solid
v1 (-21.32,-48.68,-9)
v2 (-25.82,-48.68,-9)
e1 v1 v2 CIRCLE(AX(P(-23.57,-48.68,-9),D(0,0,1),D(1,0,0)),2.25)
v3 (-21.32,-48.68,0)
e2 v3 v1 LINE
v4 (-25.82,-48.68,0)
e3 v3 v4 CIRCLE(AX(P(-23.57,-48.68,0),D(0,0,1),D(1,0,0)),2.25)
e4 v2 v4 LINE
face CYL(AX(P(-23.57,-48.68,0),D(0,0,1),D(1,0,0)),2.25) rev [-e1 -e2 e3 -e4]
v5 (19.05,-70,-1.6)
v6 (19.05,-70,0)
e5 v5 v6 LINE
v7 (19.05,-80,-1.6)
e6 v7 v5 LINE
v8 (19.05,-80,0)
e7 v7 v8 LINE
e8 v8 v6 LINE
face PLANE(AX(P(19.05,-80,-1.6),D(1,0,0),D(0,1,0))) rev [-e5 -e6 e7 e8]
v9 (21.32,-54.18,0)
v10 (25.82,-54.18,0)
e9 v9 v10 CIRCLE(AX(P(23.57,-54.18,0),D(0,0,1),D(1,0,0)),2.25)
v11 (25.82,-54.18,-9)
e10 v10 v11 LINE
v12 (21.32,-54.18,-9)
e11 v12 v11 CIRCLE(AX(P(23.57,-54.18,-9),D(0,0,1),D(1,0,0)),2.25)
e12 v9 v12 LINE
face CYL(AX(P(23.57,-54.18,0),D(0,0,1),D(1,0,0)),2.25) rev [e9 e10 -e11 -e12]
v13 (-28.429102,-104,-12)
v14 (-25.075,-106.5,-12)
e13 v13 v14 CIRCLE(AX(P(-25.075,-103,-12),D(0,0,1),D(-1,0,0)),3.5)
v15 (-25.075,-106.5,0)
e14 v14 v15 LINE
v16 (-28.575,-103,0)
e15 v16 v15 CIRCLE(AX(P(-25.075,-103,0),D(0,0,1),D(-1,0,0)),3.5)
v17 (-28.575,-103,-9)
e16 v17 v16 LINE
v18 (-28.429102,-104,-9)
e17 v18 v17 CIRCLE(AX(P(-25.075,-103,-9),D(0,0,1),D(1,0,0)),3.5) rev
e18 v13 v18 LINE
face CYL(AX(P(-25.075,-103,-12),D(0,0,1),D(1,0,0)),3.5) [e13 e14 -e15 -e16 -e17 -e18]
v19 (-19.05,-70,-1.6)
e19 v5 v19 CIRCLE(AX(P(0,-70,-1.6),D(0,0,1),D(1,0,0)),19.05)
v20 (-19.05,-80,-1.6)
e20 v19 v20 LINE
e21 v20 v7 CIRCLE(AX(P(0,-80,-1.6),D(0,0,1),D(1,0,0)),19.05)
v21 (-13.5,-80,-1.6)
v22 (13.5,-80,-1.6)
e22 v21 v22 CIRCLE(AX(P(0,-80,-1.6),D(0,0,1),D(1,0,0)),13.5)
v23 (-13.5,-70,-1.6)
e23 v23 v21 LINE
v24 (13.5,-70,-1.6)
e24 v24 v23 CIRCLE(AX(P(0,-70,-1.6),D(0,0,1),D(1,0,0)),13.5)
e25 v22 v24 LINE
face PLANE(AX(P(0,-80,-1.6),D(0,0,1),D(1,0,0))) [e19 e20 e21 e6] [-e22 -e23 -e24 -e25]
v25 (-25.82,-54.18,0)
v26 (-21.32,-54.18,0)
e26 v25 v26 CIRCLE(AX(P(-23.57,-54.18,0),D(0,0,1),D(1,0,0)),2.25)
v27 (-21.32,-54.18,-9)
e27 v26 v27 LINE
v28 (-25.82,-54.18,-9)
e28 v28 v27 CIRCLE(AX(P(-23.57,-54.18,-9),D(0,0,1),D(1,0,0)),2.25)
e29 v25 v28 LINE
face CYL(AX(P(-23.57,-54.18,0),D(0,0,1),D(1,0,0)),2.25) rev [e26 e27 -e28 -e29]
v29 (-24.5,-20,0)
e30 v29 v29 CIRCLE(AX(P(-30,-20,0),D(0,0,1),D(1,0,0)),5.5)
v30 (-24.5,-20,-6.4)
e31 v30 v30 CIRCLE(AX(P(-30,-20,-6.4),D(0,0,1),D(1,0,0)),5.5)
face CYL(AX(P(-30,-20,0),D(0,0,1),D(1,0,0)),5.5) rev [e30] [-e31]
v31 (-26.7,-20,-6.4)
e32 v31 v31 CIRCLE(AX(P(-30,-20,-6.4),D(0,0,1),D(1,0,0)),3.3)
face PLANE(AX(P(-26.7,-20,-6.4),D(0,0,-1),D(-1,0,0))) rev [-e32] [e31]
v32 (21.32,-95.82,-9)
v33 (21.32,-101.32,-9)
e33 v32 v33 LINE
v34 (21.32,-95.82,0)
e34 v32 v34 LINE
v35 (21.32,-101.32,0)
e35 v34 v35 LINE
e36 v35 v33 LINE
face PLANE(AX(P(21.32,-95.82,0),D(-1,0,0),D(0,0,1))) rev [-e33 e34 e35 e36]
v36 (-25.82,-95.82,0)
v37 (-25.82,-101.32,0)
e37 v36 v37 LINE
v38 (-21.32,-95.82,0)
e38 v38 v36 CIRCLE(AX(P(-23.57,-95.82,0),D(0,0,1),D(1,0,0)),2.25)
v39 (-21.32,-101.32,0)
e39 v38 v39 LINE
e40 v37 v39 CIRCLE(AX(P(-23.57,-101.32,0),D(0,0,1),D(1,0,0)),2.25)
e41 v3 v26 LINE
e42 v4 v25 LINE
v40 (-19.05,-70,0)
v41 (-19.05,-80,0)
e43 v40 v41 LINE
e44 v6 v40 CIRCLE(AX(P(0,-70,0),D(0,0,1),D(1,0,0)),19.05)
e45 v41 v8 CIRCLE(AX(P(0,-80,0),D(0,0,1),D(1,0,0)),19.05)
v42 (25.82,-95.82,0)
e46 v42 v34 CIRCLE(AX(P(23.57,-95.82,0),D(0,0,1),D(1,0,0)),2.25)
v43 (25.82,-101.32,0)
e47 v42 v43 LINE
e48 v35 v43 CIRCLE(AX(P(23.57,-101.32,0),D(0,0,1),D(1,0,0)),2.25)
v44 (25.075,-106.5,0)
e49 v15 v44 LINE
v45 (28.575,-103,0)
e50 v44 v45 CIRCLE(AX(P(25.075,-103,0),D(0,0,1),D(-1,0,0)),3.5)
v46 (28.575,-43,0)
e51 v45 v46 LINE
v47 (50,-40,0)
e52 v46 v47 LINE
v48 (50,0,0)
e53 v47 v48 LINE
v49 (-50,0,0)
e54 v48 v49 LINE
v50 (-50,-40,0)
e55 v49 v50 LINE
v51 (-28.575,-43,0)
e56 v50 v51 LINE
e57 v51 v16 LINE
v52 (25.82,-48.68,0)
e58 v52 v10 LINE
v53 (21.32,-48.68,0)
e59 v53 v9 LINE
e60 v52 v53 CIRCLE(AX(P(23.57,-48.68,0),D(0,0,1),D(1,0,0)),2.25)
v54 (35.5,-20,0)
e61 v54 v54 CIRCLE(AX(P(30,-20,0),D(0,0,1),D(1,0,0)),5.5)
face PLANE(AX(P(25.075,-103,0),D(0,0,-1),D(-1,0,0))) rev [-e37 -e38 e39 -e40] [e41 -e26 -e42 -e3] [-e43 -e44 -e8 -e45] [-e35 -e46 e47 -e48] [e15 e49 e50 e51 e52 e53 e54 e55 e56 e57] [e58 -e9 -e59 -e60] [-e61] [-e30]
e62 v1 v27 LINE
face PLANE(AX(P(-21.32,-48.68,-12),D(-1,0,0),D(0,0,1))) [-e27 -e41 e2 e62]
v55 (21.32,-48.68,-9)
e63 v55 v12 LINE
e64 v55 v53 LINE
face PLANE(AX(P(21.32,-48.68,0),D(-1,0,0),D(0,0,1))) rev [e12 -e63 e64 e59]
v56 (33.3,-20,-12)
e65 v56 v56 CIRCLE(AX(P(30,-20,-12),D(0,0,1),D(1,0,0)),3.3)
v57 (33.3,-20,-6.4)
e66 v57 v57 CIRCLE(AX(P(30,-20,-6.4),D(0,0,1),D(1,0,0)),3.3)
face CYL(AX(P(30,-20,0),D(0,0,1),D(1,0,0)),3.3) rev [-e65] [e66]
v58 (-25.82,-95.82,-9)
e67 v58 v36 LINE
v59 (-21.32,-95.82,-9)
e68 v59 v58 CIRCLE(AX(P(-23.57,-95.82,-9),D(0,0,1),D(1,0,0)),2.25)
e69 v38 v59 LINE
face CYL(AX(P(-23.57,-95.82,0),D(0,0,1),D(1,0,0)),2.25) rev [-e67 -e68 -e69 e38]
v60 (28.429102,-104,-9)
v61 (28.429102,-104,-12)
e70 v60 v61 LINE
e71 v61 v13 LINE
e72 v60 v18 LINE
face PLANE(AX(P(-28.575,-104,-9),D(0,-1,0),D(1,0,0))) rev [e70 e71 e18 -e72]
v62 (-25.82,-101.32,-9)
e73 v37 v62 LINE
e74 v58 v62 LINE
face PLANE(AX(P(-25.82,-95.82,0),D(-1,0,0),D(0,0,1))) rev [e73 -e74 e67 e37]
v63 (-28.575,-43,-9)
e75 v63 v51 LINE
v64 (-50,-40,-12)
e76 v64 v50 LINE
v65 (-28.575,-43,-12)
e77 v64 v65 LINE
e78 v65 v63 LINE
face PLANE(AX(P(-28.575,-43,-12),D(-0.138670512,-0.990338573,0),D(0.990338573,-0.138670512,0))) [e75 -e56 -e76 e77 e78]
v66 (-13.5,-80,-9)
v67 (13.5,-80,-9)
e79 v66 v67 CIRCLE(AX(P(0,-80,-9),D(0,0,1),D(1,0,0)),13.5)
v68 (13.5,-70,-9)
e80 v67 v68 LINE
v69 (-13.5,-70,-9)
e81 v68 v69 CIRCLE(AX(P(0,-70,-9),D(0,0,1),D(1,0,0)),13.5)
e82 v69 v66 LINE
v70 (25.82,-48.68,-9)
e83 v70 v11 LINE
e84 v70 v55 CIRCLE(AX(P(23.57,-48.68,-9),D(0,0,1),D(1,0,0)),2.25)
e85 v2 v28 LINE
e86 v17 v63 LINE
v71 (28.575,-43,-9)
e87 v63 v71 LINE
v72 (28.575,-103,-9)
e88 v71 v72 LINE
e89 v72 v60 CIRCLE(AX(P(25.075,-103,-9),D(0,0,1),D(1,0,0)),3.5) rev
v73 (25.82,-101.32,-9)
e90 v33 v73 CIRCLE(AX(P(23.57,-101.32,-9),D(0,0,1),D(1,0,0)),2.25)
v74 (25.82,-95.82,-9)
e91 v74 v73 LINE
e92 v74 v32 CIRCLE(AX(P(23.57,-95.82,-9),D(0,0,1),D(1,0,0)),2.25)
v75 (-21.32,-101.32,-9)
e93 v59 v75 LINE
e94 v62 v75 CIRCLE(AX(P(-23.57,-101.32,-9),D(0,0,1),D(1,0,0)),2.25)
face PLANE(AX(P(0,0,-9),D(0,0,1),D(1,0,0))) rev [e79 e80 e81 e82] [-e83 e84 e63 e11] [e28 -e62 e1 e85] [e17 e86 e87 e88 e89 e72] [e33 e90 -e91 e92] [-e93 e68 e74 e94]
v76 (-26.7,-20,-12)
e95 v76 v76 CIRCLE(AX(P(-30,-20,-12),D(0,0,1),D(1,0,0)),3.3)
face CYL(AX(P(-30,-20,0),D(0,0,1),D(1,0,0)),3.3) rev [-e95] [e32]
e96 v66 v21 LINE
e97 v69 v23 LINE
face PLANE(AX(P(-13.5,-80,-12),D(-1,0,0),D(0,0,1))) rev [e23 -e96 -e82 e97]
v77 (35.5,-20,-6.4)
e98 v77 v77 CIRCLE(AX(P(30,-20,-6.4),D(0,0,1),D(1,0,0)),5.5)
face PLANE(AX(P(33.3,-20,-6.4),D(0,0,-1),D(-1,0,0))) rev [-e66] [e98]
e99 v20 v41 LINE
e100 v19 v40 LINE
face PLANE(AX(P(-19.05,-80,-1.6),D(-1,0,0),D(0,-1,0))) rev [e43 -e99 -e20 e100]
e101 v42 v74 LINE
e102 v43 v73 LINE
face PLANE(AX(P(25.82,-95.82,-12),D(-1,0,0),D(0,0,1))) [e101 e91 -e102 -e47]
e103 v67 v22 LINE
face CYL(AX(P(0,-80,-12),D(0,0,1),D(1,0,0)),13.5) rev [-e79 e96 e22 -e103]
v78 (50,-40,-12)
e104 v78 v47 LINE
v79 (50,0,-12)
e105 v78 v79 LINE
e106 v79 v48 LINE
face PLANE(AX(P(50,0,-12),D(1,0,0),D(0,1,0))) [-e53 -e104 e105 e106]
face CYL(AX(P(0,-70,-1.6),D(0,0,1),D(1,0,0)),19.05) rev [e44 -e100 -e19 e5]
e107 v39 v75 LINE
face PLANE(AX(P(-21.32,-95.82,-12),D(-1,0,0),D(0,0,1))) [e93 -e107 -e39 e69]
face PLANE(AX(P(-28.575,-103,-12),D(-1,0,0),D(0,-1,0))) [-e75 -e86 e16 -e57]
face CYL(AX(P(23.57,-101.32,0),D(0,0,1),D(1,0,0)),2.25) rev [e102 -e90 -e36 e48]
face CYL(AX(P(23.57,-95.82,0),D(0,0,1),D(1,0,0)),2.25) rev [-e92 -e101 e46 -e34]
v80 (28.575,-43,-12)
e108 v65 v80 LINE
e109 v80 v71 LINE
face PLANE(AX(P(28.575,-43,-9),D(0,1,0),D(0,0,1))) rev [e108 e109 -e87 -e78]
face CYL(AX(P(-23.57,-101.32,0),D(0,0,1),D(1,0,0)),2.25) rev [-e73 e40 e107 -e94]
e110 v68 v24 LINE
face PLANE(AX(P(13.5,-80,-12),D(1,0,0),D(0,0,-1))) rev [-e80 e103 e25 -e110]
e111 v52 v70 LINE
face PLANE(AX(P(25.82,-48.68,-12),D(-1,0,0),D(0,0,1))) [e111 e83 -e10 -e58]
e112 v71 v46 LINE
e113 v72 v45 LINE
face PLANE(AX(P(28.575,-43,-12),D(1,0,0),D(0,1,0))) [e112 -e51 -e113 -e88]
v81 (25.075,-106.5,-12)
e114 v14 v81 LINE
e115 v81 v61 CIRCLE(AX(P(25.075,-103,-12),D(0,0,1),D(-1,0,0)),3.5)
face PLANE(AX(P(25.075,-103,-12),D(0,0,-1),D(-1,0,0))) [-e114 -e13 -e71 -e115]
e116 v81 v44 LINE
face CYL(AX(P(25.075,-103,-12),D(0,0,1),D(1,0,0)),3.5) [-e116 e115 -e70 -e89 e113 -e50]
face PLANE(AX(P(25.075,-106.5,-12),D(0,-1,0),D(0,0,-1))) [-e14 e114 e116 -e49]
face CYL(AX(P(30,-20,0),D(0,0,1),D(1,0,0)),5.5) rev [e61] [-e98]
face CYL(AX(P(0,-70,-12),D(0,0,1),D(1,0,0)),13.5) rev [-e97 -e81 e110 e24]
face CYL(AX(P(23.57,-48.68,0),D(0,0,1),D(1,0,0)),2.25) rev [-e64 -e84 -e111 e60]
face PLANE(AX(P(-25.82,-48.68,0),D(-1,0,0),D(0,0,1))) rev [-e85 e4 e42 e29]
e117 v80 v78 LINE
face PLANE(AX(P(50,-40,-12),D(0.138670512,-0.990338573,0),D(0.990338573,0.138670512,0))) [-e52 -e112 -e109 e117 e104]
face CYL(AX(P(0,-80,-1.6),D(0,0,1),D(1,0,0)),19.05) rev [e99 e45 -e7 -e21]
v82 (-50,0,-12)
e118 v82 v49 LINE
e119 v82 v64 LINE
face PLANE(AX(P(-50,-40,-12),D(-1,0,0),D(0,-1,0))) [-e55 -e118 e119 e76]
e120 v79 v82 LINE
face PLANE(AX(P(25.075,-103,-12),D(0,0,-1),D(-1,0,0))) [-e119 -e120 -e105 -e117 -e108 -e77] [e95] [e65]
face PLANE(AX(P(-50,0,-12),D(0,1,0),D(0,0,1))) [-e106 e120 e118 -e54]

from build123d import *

# Parameters (mm, degrees)
EXTRUDE_1_DEPTH             = 12
HOLE_WIZARD_M61_D           = 6.6
HOLE_WIZARD_M61_CBORE_D     = 11
HOLE_WIZARD_M61_CBORE_DEPTH = 6.4
SKETCH_4_W                  = 57.15
SKETCH_4_H                  = 61
CUT_EXTRUDE_1_DEPTH         = 3
CUT_EXTRUDE_2_DEPTH         = 1.6
CUT_EXTRUDE_3_DEPTH         = 119.111853766
HOLE_START                  = -9
HOLE_WIZARD_M42_DEPTH       = 9


# Read off the part's stored shape, not the designer's step: Прорезь с зазором M42
with BuildPart() as part:
    # Эскиз1 → Бобышка-Вытянуть1 (new body)
    with BuildSketch(Plane.XY):
        with BuildLine():
            Line((-50, 0), (50, 0))
            Line((50, 0), (50, -40))
            Line((50, -40), (28.575, -43))
            Line((28.575, -43), (28.575, -103))
            ThreePointArc((28.575, -103), (27.549873734, -105.474873734), (25.075, -106.5))
            Line((25.075, -106.5), (-25.075, -106.5))
            ThreePointArc((-25.075, -106.5), (-27.549873734, -105.474873734), (-28.575, -103))
            Line((-28.575, -103), (-28.575, -43))
            Line((-28.575, -43), (-50, -40))
            Line((-50, -40), (-50, 0))
        make_face()
    extrude(amount=-EXTRUDE_1_DEPTH)

    # Цековка для  винта с внутренним шестигранником M61 (through all)
    with Locations(Plane.XY):
        with Locations((-30, -20), (30, -20)):
            CounterBoreHole(HOLE_WIZARD_M61_D / 2, HOLE_WIZARD_M61_CBORE_D / 2, HOLE_WIZARD_M61_CBORE_DEPTH)

    # Эскиз4 → Вырез-Вытянуть1 (cut)
    with BuildSketch(Plane(origin=(0, 0, -12), x_dir=(-1, 0, 0), z_dir=(0, 0, -1))):
        with Locations((0, -73.5)):
            Rectangle(SKETCH_4_W, SKETCH_4_H)
    extrude(amount=-CUT_EXTRUDE_1_DEPTH, mode=Mode.SUBTRACT)

    # Эскиз12 → Вырез-Вытянуть2 (cut)
    with BuildSketch(Plane.XY):
        with BuildLine():
            Line((-19.05, -80), (-19.05, -70))
            ThreePointArc((-19.05, -70), (0, -50.95), (19.05, -70))
            Line((19.05, -70), (19.05, -80))
            ThreePointArc((19.05, -80), (0, -99.05), (-19.05, -80))
        make_face()
    extrude(amount=-CUT_EXTRUDE_2_DEPTH, mode=Mode.SUBTRACT)

    # Эскиз13 → Вырез-Вытянуть3 (cut, through all)
    with BuildSketch(Plane.XY.offset(-1.6)):
        with BuildLine():
            Line((-13.5, -80), (-13.5, -70))
            ThreePointArc((-13.5, -70), (0, -56.5), (13.5, -70))
            Line((13.5, -70), (13.5, -80))
            ThreePointArc((13.5, -80), (0, -93.5), (-13.5, -80))
        make_face()
    extrude(amount=-CUT_EXTRUDE_3_DEPTH, mode=Mode.SUBTRACT)

    # Прорезь с зазором M42 outline → Прорезь с зазором M42 (cut)
    with BuildSketch(Plane.XY.offset(HOLE_START)):
        with BuildLine():
            ThreePointArc((-21.32, -95.82), (-23.57, -93.57), (-25.82, -95.82))
            Line((-25.82, -95.82), (-25.82, -101.32))
            ThreePointArc((-25.82, -101.32), (-23.57, -103.57), (-21.32, -101.32))
            Line((-21.32, -101.32), (-21.32, -95.82))
        make_face()
        with BuildLine():
            ThreePointArc((-21.32, -48.68), (-23.57, -46.43), (-25.82, -48.68))
            Line((-25.82, -48.68), (-25.82, -54.18))
            ThreePointArc((-25.82, -54.18), (-23.57, -56.43), (-21.32, -54.18))
            Line((-21.32, -54.18), (-21.32, -48.68))
        make_face()
        with BuildLine():
            ThreePointArc((25.82, -95.82), (23.57, -93.57), (21.32, -95.82))
            Line((21.32, -95.82), (21.32, -101.32))
            ThreePointArc((21.32, -101.32), (23.57, -103.57), (25.82, -101.32))
            Line((25.82, -101.32), (25.82, -95.82))
        make_face()
        with BuildLine():
            ThreePointArc((25.82, -48.68), (23.57, -46.43), (21.32, -48.68))
            Line((21.32, -48.68), (21.32, -54.18))
            ThreePointArc((21.32, -54.18), (23.57, -56.43), (25.82, -54.18))
            Line((25.82, -54.18), (25.82, -48.68))
        make_face()
    extrude(amount=HOLE_WIZARD_M42_DEPTH, mode=Mode.SUBTRACT)


solid = part.part
